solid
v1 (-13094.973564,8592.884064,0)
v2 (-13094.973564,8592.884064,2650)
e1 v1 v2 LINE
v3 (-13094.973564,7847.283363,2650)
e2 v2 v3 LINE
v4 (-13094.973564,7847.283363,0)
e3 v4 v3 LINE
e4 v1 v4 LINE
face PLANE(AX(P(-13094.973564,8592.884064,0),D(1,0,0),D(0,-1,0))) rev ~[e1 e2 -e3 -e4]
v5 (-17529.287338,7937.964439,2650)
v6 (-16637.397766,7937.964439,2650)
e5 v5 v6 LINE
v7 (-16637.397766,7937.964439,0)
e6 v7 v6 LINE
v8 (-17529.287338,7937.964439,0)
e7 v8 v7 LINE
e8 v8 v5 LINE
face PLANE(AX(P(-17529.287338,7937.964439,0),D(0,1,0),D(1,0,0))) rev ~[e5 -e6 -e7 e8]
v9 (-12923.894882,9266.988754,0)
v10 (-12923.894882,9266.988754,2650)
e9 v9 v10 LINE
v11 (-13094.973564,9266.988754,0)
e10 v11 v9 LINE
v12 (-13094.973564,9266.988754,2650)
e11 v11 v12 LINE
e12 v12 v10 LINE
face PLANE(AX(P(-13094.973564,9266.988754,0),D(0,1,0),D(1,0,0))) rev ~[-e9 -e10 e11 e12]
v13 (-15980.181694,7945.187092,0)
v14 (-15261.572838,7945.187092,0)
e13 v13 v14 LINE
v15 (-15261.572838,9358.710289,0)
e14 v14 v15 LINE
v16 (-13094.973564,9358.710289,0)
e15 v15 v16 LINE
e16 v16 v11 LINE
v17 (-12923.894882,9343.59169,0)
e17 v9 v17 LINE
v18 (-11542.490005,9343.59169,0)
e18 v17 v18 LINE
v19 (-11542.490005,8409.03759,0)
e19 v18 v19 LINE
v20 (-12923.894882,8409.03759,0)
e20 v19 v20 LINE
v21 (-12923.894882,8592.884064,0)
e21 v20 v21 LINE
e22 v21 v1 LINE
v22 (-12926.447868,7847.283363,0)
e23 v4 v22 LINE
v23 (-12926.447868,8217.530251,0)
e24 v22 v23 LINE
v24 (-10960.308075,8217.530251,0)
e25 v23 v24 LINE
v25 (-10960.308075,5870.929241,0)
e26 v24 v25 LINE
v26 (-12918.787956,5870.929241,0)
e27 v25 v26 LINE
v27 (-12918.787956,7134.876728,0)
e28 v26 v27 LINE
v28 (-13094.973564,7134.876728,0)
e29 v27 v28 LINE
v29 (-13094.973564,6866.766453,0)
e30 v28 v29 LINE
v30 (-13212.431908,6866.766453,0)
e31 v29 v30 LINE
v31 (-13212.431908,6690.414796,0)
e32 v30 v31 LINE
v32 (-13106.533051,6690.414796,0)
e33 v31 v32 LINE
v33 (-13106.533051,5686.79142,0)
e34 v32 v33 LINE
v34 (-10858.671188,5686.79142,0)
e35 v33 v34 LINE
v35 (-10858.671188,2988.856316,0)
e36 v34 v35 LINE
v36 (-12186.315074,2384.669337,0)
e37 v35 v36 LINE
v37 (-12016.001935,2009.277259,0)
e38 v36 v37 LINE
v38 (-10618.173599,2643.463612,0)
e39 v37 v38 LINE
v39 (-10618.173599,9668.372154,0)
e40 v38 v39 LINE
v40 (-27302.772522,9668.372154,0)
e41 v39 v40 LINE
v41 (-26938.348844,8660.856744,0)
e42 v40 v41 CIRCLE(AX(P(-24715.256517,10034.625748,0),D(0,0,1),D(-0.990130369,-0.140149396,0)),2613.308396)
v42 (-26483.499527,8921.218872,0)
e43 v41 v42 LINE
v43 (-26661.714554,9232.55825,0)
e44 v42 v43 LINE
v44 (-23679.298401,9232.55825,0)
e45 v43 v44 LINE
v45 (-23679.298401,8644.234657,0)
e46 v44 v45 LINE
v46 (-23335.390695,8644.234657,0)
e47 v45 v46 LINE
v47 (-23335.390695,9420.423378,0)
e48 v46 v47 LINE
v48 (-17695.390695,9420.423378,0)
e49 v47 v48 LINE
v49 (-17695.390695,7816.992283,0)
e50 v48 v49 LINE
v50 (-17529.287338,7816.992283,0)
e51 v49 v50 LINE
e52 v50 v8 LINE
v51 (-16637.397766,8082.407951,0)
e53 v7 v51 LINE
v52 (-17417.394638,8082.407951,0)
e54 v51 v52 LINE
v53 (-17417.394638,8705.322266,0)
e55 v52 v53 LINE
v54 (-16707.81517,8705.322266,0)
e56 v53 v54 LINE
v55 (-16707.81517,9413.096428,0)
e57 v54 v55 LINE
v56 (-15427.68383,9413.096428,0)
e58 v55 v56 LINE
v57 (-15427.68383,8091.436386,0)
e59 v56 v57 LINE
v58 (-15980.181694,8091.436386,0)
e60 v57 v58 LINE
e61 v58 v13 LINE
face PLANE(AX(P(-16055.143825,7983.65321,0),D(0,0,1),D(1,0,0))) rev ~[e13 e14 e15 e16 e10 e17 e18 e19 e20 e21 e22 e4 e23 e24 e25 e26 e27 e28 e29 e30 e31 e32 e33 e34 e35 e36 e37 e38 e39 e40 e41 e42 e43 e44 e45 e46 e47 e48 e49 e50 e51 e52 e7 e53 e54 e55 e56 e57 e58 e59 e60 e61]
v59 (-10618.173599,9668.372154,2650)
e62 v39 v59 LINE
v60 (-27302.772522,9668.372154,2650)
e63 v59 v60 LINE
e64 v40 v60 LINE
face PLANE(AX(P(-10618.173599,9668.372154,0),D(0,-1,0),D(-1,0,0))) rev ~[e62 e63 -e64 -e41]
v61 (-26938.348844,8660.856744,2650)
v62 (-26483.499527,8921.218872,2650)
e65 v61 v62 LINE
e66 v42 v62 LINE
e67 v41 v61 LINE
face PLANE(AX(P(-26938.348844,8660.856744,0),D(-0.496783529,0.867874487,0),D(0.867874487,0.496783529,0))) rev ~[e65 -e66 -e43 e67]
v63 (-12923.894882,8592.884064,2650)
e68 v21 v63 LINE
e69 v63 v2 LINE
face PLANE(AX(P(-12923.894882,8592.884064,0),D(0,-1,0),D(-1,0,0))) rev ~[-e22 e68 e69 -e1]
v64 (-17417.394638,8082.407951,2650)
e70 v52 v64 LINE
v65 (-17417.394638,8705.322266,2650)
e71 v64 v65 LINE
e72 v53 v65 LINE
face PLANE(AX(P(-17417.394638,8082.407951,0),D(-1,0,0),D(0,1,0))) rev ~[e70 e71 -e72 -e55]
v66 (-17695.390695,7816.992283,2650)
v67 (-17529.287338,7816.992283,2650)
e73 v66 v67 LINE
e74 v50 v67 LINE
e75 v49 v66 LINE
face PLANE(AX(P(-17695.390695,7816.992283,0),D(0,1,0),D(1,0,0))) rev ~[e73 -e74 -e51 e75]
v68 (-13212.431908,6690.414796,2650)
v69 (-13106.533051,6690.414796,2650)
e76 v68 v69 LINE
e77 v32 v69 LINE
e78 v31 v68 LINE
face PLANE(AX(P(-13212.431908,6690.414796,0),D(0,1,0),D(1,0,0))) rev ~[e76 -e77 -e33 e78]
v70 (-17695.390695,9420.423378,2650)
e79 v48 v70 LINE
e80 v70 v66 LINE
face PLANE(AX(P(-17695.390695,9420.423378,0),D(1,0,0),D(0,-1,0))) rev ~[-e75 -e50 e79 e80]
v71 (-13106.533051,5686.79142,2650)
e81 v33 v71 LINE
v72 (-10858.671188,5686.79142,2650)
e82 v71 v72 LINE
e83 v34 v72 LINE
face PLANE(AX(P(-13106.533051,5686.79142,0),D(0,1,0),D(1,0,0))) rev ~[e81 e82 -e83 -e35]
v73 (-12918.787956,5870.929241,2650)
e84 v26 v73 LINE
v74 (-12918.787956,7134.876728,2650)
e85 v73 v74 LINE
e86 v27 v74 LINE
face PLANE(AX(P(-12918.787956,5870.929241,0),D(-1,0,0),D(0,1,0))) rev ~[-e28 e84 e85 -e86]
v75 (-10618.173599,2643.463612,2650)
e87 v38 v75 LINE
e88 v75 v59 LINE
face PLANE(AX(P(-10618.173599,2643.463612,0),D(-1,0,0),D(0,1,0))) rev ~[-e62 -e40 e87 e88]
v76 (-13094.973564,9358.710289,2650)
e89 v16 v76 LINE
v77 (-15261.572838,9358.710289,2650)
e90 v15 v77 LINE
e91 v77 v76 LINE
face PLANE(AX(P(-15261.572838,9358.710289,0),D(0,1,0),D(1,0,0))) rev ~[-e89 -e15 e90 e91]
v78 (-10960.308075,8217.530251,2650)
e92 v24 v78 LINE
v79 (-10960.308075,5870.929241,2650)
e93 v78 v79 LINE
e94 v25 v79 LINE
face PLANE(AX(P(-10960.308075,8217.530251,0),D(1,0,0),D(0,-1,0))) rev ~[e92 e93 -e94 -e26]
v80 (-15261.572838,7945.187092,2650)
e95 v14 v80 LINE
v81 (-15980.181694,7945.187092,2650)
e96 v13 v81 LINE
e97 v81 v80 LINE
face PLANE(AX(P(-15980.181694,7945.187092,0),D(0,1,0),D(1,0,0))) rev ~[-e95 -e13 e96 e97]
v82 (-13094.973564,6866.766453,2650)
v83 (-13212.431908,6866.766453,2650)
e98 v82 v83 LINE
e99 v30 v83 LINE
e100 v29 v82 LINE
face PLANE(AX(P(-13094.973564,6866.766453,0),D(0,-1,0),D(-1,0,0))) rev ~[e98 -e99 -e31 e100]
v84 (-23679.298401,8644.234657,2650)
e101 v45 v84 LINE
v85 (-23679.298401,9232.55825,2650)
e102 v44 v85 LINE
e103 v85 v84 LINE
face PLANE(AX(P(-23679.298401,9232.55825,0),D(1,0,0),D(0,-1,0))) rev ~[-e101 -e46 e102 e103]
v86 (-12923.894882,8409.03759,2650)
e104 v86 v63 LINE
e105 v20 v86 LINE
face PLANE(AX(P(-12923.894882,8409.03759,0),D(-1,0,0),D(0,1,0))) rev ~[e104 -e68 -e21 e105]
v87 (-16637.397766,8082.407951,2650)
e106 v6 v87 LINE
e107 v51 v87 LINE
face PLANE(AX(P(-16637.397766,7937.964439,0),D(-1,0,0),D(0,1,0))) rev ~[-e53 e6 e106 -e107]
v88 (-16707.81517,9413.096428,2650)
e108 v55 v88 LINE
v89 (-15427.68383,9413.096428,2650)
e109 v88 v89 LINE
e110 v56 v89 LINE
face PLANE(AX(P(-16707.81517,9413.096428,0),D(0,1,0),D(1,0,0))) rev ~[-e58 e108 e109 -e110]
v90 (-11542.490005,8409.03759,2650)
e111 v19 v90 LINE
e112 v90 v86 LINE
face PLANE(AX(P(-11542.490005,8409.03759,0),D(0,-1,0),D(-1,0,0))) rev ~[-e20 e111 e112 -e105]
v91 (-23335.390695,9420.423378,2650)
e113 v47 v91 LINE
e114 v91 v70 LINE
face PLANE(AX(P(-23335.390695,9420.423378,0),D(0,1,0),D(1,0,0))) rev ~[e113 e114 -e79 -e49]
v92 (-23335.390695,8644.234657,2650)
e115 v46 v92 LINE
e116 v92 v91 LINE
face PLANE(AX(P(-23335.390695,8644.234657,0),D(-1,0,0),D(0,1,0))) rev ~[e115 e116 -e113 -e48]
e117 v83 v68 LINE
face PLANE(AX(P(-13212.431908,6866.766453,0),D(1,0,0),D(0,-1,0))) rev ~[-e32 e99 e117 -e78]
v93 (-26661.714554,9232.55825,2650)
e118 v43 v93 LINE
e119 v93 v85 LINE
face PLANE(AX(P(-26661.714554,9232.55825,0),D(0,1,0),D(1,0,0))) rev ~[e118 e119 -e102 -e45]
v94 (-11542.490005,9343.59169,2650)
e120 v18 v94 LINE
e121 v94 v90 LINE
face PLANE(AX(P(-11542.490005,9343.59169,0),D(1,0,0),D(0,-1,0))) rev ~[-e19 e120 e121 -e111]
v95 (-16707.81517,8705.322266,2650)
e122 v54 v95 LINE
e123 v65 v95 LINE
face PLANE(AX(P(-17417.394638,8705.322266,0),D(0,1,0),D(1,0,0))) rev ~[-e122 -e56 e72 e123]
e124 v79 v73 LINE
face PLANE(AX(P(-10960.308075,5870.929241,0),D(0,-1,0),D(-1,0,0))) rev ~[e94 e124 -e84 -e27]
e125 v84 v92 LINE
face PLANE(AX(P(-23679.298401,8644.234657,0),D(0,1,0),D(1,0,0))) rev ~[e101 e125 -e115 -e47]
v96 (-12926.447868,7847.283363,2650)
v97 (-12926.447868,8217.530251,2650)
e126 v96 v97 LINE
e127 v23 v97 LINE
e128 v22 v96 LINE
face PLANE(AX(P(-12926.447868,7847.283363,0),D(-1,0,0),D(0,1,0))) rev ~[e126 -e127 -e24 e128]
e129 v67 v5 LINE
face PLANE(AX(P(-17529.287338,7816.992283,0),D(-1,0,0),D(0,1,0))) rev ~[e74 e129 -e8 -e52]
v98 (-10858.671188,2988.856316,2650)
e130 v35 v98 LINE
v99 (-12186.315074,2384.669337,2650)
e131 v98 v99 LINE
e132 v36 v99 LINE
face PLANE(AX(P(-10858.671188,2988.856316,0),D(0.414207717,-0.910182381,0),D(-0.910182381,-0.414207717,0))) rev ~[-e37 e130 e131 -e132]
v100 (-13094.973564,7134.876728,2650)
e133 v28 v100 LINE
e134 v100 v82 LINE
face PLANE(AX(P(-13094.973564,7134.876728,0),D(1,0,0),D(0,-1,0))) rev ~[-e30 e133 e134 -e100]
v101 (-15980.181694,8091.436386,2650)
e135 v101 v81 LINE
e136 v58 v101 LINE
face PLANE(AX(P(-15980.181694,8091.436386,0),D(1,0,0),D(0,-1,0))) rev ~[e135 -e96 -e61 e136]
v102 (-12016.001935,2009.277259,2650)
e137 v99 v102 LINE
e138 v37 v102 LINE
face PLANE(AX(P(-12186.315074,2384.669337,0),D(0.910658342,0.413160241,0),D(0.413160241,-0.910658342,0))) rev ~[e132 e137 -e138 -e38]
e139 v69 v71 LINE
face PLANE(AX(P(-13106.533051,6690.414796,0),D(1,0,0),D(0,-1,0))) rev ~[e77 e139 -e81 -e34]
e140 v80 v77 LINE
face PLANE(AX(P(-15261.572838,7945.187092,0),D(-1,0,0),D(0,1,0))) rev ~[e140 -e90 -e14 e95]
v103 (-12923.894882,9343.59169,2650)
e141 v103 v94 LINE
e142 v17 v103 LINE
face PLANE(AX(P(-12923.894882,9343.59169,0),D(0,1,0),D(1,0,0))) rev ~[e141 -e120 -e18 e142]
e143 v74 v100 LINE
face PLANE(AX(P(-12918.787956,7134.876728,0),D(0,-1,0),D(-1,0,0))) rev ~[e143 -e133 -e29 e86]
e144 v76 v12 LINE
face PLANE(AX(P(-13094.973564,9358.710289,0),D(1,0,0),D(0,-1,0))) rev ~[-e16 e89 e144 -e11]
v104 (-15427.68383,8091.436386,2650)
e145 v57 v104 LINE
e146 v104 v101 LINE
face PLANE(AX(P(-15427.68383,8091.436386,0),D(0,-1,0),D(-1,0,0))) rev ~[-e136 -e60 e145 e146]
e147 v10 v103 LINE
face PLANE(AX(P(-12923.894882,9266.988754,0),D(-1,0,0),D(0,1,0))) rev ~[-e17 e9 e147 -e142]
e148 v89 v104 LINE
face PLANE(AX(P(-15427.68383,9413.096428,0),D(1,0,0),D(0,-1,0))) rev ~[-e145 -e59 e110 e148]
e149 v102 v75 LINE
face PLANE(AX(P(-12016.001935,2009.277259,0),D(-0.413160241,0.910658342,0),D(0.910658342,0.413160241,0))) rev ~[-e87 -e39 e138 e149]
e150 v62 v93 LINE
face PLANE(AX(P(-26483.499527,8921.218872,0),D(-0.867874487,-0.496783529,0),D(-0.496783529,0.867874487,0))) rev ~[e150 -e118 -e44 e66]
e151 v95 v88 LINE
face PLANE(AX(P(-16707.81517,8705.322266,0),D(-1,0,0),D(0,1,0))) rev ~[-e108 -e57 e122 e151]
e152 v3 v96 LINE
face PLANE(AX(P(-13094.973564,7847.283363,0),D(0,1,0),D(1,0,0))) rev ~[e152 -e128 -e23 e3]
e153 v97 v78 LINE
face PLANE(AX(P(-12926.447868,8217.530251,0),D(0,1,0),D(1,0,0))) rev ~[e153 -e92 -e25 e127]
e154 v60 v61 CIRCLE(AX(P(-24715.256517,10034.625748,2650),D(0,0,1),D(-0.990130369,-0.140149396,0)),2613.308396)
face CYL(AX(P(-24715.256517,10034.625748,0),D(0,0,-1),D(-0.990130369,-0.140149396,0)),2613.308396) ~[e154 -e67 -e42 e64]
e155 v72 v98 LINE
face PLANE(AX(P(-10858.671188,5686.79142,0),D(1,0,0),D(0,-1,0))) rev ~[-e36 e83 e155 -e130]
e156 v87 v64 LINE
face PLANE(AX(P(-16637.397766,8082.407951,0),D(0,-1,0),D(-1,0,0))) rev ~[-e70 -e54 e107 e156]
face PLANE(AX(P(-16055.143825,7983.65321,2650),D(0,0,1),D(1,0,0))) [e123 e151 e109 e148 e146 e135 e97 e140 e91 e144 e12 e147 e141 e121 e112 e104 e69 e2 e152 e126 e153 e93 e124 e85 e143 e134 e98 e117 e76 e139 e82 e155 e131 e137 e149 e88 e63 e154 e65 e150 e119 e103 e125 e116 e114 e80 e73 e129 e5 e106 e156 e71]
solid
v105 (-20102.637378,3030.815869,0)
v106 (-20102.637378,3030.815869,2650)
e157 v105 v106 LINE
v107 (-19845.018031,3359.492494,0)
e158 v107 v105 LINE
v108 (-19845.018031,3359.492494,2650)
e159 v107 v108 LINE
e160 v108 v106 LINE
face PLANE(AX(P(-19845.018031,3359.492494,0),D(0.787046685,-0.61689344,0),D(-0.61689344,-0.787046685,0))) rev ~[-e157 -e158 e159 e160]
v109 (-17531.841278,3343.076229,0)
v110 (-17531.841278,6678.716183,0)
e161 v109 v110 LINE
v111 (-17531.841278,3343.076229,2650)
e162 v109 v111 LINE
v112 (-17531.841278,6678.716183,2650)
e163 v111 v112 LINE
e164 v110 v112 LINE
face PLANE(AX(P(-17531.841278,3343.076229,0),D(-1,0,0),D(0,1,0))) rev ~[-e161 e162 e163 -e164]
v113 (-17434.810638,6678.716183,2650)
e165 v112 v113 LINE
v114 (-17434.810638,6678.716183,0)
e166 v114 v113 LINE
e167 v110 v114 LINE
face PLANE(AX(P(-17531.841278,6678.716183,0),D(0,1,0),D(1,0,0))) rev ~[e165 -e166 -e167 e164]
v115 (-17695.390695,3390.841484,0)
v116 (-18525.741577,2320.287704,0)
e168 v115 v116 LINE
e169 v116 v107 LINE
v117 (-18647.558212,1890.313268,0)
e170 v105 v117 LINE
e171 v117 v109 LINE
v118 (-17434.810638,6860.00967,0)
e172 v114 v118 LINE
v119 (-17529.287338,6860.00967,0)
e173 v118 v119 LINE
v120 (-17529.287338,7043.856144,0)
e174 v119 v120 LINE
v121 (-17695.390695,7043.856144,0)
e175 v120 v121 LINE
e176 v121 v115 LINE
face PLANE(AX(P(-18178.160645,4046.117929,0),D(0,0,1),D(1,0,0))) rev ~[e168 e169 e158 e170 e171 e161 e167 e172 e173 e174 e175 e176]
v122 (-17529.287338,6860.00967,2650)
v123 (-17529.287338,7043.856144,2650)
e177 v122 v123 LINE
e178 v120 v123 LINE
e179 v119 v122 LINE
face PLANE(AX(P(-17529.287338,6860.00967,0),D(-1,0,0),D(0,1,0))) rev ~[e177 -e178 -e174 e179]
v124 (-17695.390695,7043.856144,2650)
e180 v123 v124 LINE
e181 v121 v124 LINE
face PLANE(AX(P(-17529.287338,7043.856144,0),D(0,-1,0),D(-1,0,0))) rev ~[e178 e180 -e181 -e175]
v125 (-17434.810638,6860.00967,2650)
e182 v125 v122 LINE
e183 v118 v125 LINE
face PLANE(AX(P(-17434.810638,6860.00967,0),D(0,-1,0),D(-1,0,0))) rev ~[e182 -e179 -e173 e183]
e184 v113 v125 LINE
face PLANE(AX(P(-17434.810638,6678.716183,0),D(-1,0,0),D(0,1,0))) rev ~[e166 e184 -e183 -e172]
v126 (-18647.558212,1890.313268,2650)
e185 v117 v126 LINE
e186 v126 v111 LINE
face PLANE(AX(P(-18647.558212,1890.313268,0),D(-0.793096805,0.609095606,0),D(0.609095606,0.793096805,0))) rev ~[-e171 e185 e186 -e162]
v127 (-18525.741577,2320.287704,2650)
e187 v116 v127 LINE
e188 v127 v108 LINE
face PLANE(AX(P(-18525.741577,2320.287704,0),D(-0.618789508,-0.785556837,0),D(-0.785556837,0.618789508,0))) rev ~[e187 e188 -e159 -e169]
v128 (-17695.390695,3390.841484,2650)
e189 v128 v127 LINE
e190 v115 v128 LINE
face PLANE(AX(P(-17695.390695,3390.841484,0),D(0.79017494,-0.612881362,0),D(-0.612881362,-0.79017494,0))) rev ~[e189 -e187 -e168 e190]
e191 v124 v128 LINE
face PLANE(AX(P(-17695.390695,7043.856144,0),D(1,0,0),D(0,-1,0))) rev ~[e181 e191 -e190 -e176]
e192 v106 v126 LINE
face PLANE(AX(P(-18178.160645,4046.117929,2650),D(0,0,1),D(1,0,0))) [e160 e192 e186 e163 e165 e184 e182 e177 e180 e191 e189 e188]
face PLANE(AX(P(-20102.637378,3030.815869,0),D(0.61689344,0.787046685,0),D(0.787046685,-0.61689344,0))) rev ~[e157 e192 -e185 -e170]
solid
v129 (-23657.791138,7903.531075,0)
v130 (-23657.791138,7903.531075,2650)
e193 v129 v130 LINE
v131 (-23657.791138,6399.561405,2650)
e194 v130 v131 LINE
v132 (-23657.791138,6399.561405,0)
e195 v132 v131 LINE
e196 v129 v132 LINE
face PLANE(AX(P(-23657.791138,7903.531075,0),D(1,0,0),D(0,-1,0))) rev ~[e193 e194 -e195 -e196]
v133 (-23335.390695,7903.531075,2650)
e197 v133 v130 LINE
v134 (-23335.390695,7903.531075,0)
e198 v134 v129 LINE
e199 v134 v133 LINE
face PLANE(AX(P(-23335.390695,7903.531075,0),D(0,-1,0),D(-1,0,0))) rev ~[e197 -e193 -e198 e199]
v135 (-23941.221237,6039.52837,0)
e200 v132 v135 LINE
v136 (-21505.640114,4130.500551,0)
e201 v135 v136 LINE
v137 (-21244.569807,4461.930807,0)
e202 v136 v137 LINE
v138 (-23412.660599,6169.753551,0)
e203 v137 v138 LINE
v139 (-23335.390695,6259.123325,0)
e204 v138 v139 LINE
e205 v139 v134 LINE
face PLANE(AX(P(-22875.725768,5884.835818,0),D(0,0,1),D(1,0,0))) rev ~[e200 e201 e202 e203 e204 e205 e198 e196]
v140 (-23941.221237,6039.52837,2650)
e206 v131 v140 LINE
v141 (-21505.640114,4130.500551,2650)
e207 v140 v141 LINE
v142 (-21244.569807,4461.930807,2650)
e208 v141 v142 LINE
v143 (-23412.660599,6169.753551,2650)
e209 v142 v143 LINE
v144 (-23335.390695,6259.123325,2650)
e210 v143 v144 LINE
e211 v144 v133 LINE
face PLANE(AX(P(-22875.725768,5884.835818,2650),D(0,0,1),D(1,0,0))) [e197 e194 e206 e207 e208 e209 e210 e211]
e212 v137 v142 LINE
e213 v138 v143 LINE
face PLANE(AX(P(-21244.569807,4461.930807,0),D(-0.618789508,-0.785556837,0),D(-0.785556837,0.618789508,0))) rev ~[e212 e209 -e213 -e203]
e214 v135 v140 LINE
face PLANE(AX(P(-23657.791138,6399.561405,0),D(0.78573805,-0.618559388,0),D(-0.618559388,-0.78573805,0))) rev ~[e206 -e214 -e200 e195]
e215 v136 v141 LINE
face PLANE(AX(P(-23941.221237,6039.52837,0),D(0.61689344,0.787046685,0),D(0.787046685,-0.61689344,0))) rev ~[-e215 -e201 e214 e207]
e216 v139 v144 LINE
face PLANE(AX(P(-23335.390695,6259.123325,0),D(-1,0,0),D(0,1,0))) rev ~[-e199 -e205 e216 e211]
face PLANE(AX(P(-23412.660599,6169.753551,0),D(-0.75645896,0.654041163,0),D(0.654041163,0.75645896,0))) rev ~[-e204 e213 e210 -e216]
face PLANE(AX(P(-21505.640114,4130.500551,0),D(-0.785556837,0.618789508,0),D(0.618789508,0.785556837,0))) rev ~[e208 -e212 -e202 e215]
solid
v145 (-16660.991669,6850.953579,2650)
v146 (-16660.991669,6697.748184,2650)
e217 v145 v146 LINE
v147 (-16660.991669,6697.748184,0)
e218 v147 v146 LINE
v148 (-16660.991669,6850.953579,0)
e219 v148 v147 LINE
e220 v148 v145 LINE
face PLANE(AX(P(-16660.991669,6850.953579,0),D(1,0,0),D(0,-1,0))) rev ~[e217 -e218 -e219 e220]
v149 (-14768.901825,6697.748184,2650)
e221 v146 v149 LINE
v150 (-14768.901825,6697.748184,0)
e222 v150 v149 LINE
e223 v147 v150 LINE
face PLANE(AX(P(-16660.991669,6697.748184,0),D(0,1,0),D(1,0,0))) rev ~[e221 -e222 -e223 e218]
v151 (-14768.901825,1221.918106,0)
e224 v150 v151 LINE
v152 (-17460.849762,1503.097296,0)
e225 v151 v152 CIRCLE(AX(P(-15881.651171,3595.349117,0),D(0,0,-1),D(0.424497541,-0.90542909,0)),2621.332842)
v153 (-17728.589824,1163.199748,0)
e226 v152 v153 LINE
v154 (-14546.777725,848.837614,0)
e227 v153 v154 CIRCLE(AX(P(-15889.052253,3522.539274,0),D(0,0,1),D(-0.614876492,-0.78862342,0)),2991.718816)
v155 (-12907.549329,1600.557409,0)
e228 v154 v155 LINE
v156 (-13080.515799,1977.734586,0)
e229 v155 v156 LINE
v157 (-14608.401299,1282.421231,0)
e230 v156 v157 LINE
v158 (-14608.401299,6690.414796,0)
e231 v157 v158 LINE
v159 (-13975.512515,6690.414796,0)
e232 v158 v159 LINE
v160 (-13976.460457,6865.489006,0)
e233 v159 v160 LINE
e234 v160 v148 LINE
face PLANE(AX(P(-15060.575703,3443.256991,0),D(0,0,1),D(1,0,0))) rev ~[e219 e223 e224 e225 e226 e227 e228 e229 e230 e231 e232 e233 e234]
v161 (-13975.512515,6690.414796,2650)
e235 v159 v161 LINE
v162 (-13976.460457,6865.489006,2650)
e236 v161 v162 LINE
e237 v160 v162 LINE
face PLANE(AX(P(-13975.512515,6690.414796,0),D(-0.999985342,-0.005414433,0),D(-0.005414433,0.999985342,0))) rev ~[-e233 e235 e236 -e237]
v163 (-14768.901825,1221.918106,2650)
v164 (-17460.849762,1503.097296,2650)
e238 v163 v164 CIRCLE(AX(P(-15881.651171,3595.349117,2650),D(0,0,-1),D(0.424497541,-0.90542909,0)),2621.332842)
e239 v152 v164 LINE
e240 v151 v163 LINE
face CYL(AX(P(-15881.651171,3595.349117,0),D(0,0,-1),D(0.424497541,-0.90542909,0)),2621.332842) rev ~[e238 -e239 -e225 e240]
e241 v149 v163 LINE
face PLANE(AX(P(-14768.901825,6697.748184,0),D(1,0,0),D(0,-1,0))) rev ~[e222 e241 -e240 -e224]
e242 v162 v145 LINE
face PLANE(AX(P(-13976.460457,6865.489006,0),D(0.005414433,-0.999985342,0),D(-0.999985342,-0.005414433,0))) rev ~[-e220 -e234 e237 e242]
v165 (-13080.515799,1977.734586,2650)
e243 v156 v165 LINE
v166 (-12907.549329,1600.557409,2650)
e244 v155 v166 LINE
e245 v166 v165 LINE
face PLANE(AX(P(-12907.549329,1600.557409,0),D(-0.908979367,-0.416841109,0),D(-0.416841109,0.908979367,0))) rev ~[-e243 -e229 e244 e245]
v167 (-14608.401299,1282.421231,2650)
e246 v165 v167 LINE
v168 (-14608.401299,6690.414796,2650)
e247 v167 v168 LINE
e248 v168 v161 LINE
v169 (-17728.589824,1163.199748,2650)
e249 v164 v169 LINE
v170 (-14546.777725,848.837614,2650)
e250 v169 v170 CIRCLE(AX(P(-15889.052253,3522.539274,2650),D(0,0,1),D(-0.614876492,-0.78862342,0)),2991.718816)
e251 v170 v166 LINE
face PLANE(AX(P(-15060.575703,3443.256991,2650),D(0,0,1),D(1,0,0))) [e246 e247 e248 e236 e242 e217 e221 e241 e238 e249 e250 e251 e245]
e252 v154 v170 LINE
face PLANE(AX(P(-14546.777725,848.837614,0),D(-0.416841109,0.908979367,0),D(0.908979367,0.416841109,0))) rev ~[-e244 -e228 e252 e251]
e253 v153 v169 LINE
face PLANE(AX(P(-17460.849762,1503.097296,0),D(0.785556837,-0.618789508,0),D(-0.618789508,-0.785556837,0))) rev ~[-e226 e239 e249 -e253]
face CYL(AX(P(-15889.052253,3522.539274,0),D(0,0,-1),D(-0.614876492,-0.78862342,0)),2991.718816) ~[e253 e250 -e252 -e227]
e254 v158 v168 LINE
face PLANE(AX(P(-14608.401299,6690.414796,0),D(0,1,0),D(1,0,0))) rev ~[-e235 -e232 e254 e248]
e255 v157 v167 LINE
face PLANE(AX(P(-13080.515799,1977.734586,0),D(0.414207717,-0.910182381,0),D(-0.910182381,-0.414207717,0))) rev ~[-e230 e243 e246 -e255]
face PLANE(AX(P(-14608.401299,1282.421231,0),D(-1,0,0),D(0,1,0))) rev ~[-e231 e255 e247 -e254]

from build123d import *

# Parameters (mm, degrees)
F2_DEPTH = 2650


# Not quite as in the source:
# - a feature of the source that left no trace in its solid (it failed there, or was rolled back) is left out


with BuildPart() as f2:
    # F1 (on Top) → F2 (new body)
    with BuildSketch(Plane.XY):
        with BuildLine():
            Line((-26938.3488437603, 8660.8567436642), (-26483.4995269775, 8921.2188720703))
            Line((-26483.4995269775, 8921.2188720703), (-26661.714553833, 9232.5582504272))
            Line((-26661.714553833, 9232.5582504272), (-23679.2984008789, 9232.5582504272))
            Line((-23679.2984008789, 9232.5582504272), (-23679.2984008789, 8644.2346572876))
            Line((-23679.2984008789, 8644.2346572876), (-23335.3906952519, 8644.2346572876))
            Line((-23335.3906952519, 8644.2346572876), (-23335.3906952519, 9420.423377643))
            Line((-23335.3906952519, 9420.423377643), (-17884.4909667969, 9420.423377643))
            Line((-17884.4909667969, 9420.423377643), (-17695.3906952519, 9420.423377643))
            Line((-17695.3906952519, 9420.423377643), (-17695.3906952519, 7816.9922828674))
            Line((-17695.3906952519, 7816.9922828674), (-17529.2873382568, 7816.9922828674))
            Line((-17529.2873382568, 7816.9922828674), (-17529.2873382568, 7937.9644393921))
            Line((-17529.2873382568, 7937.9644393921), (-16637.3977661133, 7937.9644393921))
            Line((-16637.3977661133, 7937.9644393921), (-16637.3977661133, 8082.407951355))
            Line((-16637.3977661133, 8082.407951355), (-17417.3946380615, 8082.407951355))
            Line((-17417.3946380615, 8082.407951355), (-17417.3946380615, 8705.322265625))
            Line((-17417.3946380615, 8705.322265625), (-16707.8151702881, 8705.322265625))
            Line((-16707.8151702881, 8705.322265625), (-16707.8151702881, 9413.0964279175))
            Line((-16707.8151702881, 9413.0964279175), (-15427.6838302612, 9413.0964279175))
            Line((-15427.6838302612, 9413.0964279175), (-15427.6838302612, 8091.4363861084))
            Line((-15427.6838302612, 8091.4363861084), (-15980.1816940308, 8091.4363861084))
            Line((-15980.1816940308, 8091.4363861084), (-15980.1816940308, 7945.1870918274))
            Line((-15980.1816940308, 7945.1870918274), (-15261.5728378296, 7945.1870918274))
            Line((-15261.5728378296, 7945.1870918274), (-15261.5728378296, 9358.7102890015))
            Line((-15261.5728378296, 9358.7102890015), (-13094.9735641479, 9358.7102890015))
            Line((-13094.9735641479, 9358.7102890015), (-13094.9735641479, 9266.9887542725))
            Line((-13094.9735641479, 9266.9887542725), (-12923.8948822021, 9266.9887542725))
            Line((-12923.8948822021, 9266.9887542725), (-12923.8948822021, 9343.5916900635))
            Line((-12923.8948822021, 9343.5916900635), (-11542.4900054932, 9343.5916900635))
            Line((-11542.4900054932, 9343.5916900635), (-11542.4900054932, 8409.0375900269))
            Line((-11542.4900054932, 8409.0375900269), (-12923.8948822021, 8409.0375900269))
            Line((-12923.8948822021, 8409.0375900269), (-12923.8948822021, 8592.8840637207))
            Line((-12923.8948822021, 8592.8840637207), (-13094.9735641479, 8592.8840637207))
            Line((-13094.9735641479, 8592.8840637207), (-13094.9735641479, 7847.2833633423))
            Line((-13094.9735641479, 7847.2833633423), (-12926.4478683472, 7847.2833633423))
            Line((-12926.4478683472, 7847.2833633423), (-12926.4478683472, 8217.5302505493))
            Line((-12926.4478683472, 8217.5302505493), (-10960.3080749512, 8217.5302505493))
            Line((-10960.3080749512, 8217.5302505493), (-10960.3080749512, 5870.9292411804))
            Line((-10960.3080749512, 5870.9292411804), (-12918.7879562378, 5870.9292411804))
            Line((-12918.7879562378, 5870.9292411804), (-12918.7879562378, 7134.8767280579))
            Line((-12918.7879562378, 7134.8767280579), (-13094.9735641479, 7134.8767280579))
            Line((-13094.9735641479, 7134.8767280579), (-13094.9735641479, 6866.7664527893))
            Line((-13094.9735641479, 6866.7664527893), (-13212.4319076538, 6866.7664527893))
            Line((-13212.4319076538, 6866.7664527893), (-13212.4319076538, 6690.4147962649))
            Line((-13212.4319076538, 6690.4147962649), (-13106.5330505371, 6690.4147962649))
            Line((-13106.5330505371, 6690.4147962649), (-13106.5330505371, 5686.7914199829))
            Line((-13106.5330505371, 5686.7914199829), (-10858.6711883545, 5686.7914199829))
            Line((-10858.6711883545, 5686.7914199829), (-10858.6711883545, 2988.8563156128))
            Line((-10858.6711883545, 2988.8563156128), (-12186.3150742964, 2384.6693368377))
            Line((-12186.3150742964, 2384.6693368377), (-12016.0019347874, 2009.2772593156))
            Line((-12016.0019347874, 2009.2772593156), (-10618.1735992432, 2643.4636116028))
            Line((-10618.1735992432, 2643.4636116028), (-10618.1735992432, 9668.3721542358))
            Line((-10618.1735992432, 9668.3721542358), (-26876.350402832, 9668.3721542358))
            Line((-26876.350402832, 9668.3721542358), (-27302.7725219727, 9668.3721542358))
            ThreePointArc((-27302.7725219727, 9668.3721542358), (-27172.7470980576, 9145.7383452427), (-26938.3488437603, 8660.8567436642))
        make_face()
    extrude(amount=F2_DEPTH)


with BuildPart() as f2b:
    # F1 (on Top) → F2, piece 2 (new body)
    with BuildSketch(Plane.XY):
        Polygon((-23657.7911376953, 6399.5614051819), (-23941.2212371826, 6039.5283699036), (-21505.6401140405, 4130.5005509388), (-21244.5698068112, 4461.9308067403), (-23412.6605987549, 6169.7535514832), (-23335.3906952519, 6259.1233253479), (-23335.3906952519, 7903.5310745239), (-23657.7911376953, 7903.5310745239), align=None)
    extrude(amount=F2_DEPTH)


with BuildPart() as f2c:
    # F1 (on Top) → F2, piece 3 (new body)
    with BuildSketch(Plane.XY):
        Polygon((-19845.0180308134, 3359.4924935591), (-20102.637378283, 3030.8158690385), (-18647.5582122803, 1890.3132677078), (-17531.8412780762, 3343.0762290955), (-17531.8412780762, 6678.7161827087), (-17434.8106384277, 6678.7161827087), (-17434.8106384277, 6860.0096702576), (-17529.2873382568, 6860.0096702576), (-17529.2873382568, 7043.8561439514), (-17695.3906952519, 7043.8561439514), (-17695.3906952519, 3390.8414840698), (-18525.7415771484, 2320.2877044678), align=None)
    extrude(amount=F2_DEPTH)


with BuildPart() as f2d:
    # F1 (on Top) → F2, piece 4 (new body)
    with BuildSketch(Plane.XY):
        with BuildLine():
            Line((-14546.7777252197, 848.8376140594), (-12907.5493286593, 1600.5574085741))
            Line((-12907.5493286593, 1600.5574085741), (-13080.5157991396, 1977.7345856727))
            Line((-13080.5157991396, 1977.7345856727), (-14608.4012985229, 1282.4212312698))
            Line((-14608.4012985229, 1282.4212312698), (-14608.4012985229, 6690.4147962649))
            Line((-14608.4012985229, 6690.4147962649), (-13975.5125153972, 6690.4147962649))
            Line((-13975.5125153972, 6690.4147962649), (-13976.4604568481, 6865.4890060425))
            Line((-13976.4604568481, 6865.4890060425), (-16660.9916687012, 6850.953578949))
            Line((-16660.9916687012, 6850.953578949), (-16660.9916687012, 6697.7481842041))
            Line((-16660.9916687012, 6697.7481842041), (-14768.9018249512, 6697.7481842041))
            Line((-14768.9018249512, 6697.7481842041), (-14768.9018249512, 1221.9181060791))
            ThreePointArc((-14768.9018249512, 1221.9181060791), (-16153.972963618, 988.199962581), (-17460.8497619629, 1503.0972957611))
            Line((-17460.8497619629, 1503.0972957611), (-17728.5898237902, 1163.199748156))
            ThreePointArc((-17728.5898237902, 1163.199748156), (-16183.2010610926, 545.3160790761), (-14546.7777252197, 848.8376140594))
        make_face()
    extrude(amount=F2_DEPTH)


solid = Compound([f2.part, f2b.part, f2c.part, f2d.part])
